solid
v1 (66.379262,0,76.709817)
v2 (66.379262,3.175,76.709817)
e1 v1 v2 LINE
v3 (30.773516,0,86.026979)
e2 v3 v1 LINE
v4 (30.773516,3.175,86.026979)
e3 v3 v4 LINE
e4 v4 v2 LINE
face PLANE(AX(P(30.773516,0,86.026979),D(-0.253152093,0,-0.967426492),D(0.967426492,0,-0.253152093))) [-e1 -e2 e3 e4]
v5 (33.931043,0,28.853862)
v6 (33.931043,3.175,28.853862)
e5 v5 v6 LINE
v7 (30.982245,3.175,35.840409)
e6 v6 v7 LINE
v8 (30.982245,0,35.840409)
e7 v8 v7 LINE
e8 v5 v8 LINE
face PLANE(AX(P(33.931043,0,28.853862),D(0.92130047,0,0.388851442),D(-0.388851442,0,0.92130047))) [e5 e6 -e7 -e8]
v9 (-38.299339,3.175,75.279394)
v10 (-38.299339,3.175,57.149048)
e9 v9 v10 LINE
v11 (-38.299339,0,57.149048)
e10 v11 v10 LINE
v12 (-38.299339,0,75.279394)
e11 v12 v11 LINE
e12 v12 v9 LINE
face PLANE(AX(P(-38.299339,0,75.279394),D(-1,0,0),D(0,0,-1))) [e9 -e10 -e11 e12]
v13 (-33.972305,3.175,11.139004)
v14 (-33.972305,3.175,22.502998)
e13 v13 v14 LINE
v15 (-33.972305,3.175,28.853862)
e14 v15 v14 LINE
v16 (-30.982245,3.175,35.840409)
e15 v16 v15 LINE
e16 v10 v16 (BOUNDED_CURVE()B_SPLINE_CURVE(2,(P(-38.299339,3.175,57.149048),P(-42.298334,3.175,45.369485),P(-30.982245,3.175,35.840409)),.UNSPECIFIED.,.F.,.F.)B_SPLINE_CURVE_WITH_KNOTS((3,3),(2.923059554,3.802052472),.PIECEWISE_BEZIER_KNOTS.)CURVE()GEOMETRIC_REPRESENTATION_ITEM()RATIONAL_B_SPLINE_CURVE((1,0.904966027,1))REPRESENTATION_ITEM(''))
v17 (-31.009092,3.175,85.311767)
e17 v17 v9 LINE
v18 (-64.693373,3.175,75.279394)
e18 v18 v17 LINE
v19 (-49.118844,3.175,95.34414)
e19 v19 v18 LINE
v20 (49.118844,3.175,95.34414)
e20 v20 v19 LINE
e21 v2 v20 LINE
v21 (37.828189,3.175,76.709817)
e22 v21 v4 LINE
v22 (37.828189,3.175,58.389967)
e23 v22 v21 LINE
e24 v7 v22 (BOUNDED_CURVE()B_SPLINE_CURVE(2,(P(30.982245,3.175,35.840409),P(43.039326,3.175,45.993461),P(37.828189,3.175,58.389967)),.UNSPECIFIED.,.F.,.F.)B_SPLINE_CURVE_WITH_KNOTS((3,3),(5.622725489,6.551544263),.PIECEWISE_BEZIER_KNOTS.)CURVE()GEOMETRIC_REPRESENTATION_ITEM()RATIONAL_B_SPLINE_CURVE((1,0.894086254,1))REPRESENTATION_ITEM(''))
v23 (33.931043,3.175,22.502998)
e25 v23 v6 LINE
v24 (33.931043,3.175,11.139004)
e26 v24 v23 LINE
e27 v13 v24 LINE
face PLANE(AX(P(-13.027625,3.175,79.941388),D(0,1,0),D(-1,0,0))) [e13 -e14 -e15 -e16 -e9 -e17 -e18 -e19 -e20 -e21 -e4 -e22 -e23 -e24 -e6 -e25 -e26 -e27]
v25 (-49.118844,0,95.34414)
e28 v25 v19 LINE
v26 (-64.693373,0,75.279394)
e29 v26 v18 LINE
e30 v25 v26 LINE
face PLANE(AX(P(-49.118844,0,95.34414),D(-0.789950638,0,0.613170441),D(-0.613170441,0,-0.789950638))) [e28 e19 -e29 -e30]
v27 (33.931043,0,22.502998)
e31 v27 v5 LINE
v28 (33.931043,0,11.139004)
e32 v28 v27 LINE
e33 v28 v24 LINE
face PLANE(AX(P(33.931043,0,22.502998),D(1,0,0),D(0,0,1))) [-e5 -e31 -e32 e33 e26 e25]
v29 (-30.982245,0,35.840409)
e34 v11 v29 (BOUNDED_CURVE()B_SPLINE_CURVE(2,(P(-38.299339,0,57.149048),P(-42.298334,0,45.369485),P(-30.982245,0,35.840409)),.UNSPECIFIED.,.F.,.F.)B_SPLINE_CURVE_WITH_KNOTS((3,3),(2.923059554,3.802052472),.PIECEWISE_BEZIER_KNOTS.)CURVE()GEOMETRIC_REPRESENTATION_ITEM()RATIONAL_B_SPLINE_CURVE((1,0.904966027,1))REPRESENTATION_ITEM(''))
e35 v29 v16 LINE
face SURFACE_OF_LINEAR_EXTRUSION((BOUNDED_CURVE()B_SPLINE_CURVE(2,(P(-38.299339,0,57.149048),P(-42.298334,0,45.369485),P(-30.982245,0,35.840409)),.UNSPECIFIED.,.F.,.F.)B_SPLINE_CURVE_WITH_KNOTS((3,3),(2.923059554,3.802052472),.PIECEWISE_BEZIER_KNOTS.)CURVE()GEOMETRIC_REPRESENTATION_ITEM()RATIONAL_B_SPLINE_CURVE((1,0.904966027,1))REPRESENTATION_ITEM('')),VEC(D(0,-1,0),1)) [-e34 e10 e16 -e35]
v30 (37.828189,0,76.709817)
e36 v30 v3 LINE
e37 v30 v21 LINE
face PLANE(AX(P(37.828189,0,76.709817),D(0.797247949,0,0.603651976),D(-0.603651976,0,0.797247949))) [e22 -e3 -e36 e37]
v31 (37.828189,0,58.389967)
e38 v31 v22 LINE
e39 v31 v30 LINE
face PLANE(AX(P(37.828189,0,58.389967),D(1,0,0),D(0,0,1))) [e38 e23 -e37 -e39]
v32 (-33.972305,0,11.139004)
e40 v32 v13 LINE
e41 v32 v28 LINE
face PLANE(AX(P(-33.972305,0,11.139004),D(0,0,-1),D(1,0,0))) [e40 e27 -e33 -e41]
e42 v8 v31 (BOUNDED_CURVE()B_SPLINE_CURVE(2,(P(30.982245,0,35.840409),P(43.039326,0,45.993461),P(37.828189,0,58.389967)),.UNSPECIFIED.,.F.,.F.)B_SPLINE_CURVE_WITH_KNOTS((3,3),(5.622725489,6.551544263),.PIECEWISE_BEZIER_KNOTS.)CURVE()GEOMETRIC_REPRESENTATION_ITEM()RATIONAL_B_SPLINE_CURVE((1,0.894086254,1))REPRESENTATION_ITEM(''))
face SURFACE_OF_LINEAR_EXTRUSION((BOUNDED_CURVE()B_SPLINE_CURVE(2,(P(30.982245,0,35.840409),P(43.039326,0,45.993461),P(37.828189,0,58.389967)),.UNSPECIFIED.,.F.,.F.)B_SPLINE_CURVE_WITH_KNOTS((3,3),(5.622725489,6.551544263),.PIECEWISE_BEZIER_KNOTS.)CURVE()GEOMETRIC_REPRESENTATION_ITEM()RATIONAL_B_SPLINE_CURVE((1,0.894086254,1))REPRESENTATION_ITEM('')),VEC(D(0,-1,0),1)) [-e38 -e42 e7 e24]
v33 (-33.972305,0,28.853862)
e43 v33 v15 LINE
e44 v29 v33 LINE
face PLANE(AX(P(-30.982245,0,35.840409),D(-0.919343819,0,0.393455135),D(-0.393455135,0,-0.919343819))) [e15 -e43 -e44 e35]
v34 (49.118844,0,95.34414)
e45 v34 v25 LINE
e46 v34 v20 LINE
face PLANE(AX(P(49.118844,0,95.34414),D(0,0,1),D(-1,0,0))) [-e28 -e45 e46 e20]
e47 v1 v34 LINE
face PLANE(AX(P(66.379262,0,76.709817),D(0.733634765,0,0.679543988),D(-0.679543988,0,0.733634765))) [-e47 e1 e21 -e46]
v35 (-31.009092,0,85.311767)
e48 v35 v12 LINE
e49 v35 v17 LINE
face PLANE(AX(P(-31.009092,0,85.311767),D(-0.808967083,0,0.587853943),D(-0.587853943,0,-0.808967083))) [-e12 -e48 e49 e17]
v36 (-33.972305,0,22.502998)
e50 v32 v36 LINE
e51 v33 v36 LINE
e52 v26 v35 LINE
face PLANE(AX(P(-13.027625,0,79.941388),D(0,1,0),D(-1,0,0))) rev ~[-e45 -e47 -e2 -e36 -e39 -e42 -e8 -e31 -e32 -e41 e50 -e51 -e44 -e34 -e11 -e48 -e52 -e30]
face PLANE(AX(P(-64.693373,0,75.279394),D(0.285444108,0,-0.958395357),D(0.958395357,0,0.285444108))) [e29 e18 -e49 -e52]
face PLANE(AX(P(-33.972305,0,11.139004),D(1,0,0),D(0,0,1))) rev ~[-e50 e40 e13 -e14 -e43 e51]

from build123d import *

# Parameters (mm, degrees)
F0_W     = 22.0716209825
F0_H     = 11.3639943302
F0_W_2   = 22.1128826787
F1_DEPTH = 3.175


with BuildPart() as f1:
    # F0 (on Front) → F1 (new body)
    with BuildSketch(Plane.XZ):
        with BuildLine():
            add(Edge.make_bspline(
                [(0, 77.2495130793), (-13.2024395854, 77.2495130793), (-23.7188442589, 72.0280801734)],
                knots=[1.5707963268, 1.5707963268, 1.5707963268, 2.2200254143, 2.2200254143, 2.2200254143], degree=2, weights=[1, 0.9477737356, 1]))
            ThreePointArc((0, 77.2495130793), (-14.9655593265, 88.7487135304), (-23.7188442589, 72.0280801734))
        make_face()
        with BuildLine():
            add(Edge.make_bspline(
                [(37.8281886895, 58.3899668587), (34.3045126324, 66.7722575902), (23.7188442589, 72.0280801734)],
                knots=[0.2683589556, 0.2683589556, 0.2683589556, 0.9215672393, 0.9215672393, 0.9215672393], degree=2, weights=[1, 0.9471372908, 1]))
            add(Edge.make_bspline(
                [(23.7188442589, 72.0280801734), (13.2024395854, 77.2495130793), (0, 77.2495130793)],
                knots=[0.9215672393, 0.9215672393, 0.9215672393, 1.5707963268, 1.5707963268, 1.5707963268], degree=2, weights=[1, 0.9477737356, 1]))
            add(Edge.make_bspline(
                [(0, 77.2495130793), (-13.2024395854, 77.2495130793), (-23.7188442589, 72.0280801734)],
                knots=[1.5707963268, 1.5707963268, 1.5707963268, 2.2200254143, 2.2200254143, 2.2200254143], degree=2, weights=[1, 0.9477737356, 1]))
            add(Edge.make_bspline(
                [(-23.7188442589, 72.0280801734), (-35.179956424, 66.3375965856), (-38.2993388492, 57.1490477352)],
                knots=[2.2200254143, 2.2200254143, 2.2200254143, 2.9230595545, 2.9230595545, 2.9230595545], degree=2, weights=[1, 0.9388514321, 1]))
            add(Edge.make_bspline(
                [(-38.2993388492, 57.1490477352), (-42.2983339169, 45.3694848208), (-30.9822451126, 35.8404089541)],
                knots=[2.9230595545, 2.9230595545, 2.9230595545, 3.8020524721, 3.8020524721, 3.8020524721], degree=2, weights=[1, 0.9049660266, 1]))
            Line((-30.9822451126, 35.8404089541), (-33.9723048082, 28.8538616849))
            Line((-33.9723048082, 28.8538616849), (-33.9723048082, 22.5029981736))
            Line((-33.9723048082, 22.5029981736), (-11.8594221295, 22.5029981736))
            Line((-11.8594221295, 22.5029981736), (-11.8594221295, 11.1390038435))
            Line((-11.8594221295, 11.1390038435), (11.8594221295, 11.1390038435))
            Line((11.8594221295, 11.1390038435), (11.8594221295, 22.5029981736))
            Line((11.8594221295, 22.5029981736), (33.931043112, 22.5029981736))
            Line((33.931043112, 22.5029981736), (33.931043112, 28.8538616849))
            Line((33.931043112, 28.8538616849), (30.9822451126, 35.8404089541))
            add(Edge.make_bspline(
                [(30.9822451126, 35.8404089541), (43.0393262584, 45.9934612106), (37.8281886895, 58.3899668587)],
                knots=[5.6227254887, 5.6227254887, 5.6227254887, 6.5515442627, 6.5515442627, 6.5515442627], degree=2, weights=[1, 0.894086254, 1]))
        make_face()
        with BuildLine():
            add(Edge.make_bspline(
                [(23.7188442589, 57.1490477352), (23.7188442589, 89.4658166317), (-16.7717556174, 66.614410199), (-57.2623554937, 43.7630037663), (0, 43.7630037663)],
                knots=[0, 0, 0, 2.3561944902, 2.3561944902, 4.7123889804, 4.7123889804, 4.7123889804], degree=2, weights=[1, 0.3826834324, 1, 0.3826834324, 1]))
            add(Edge.make_bspline(
                [(0, 43.7630037663), (23.7188442589, 43.7630037663), (23.7188442589, 57.1490477352)],
                knots=[4.7123889804, 4.7123889804, 4.7123889804, 6.2831853072, 6.2831853072, 6.2831853072], degree=2, weights=[1, 0.7071067812, 1]))
        make_face(mode=Mode.SUBTRACT)
        with Locations((22.8952326207, 16.8210010086)):
            Rectangle(F0_W, F0_H)
        with BuildLine():
            add(Edge.make_bspline(
                [(23.7188442589, 72.0280801734), (13.2024395854, 77.2495130793), (0, 77.2495130793)],
                knots=[0.9215672393, 0.9215672393, 0.9215672393, 1.5707963268, 1.5707963268, 1.5707963268], degree=2, weights=[1, 0.9477737356, 1]))
            ThreePointArc((23.7188442589, 72.0280801734), (14.8063132284, 88.0253233293), (0, 77.2495130793))
        make_face()
        with BuildLine():
            add(Edge.make_bspline(
                [(0, 43.7630037663), (23.7188442589, 43.7630037663), (23.7188442589, 57.1490477352)],
                knots=[4.7123889804, 4.7123889804, 4.7123889804, 6.2831853072, 6.2831853072, 6.2831853072], degree=2, weights=[1, 0.7071067812, 1]))
            add(Edge.make_bspline(
                [(23.7188442589, 57.1490477352), (23.7188442589, 89.4658166317), (-16.7717556174, 66.614410199), (-57.2623554937, 43.7630037663), (0, 43.7630037663)],
                knots=[0, 0, 0, 2.3561944902, 2.3561944902, 4.7123889804, 4.7123889804, 4.7123889804], degree=2, weights=[1, 0.3826834324, 1, 0.3826834324, 1]))
        make_face()
        with BuildLine():
            ThreePointArc((0, 77.2495130793), (14.8063132284, 88.0253233293), (23.7188442589, 72.0280801734))
            add(Edge.make_bspline(
                [(37.8281886895, 58.3899668587), (34.3045126324, 66.7722575902), (23.7188442589, 72.0280801734)],
                knots=[0.2683589556, 0.2683589556, 0.2683589556, 0.9215672393, 0.9215672393, 0.9215672393], degree=2, weights=[1, 0.9471372908, 1]))
            Line((37.8281886895, 58.3899668587), (37.8281886895, 76.7098173911))
            Line((37.8281886895, 76.7098173911), (30.7735164742, 86.026978908))
            Line((30.7735164742, 86.026978908), (66.3792615504, 76.7098173911))
            Line((66.3792615504, 76.7098173911), (49.1188442589, 95.3441404248))
            Line((49.1188442589, 95.3441404248), (23.7188442589, 95.3441404248))
            Line((23.7188442589, 95.3441404248), (-23.7188442589, 95.3441404248))
            Line((-23.7188442589, 95.3441404248), (-49.1188442589, 95.3441404248))
            Line((-49.1188442589, 95.3441404248), (-64.6933734609, 75.2793942231))
            Line((-64.6933734609, 75.2793942231), (-31.0090915541, 85.311767324))
            Line((-31.0090915541, 85.311767324), (-38.2993388492, 75.2793942231))
            Line((-38.2993388492, 75.2793942231), (-38.2993388492, 57.1490477352))
            add(Edge.make_bspline(
                [(-23.7188442589, 72.0280801734), (-35.179956424, 66.3375965856), (-38.2993388492, 57.1490477352)],
                knots=[2.2200254143, 2.2200254143, 2.2200254143, 2.9230595545, 2.9230595545, 2.9230595545], degree=2, weights=[1, 0.9388514321, 1]))
            ThreePointArc((-23.7188442589, 72.0280801734), (-14.9655593265, 88.7487135304), (0, 77.2495130793))
        make_face()
        with Locations((-22.9158634688, 16.8210010086)):
            Rectangle(F0_W_2, F0_H)
    extrude(amount=-F1_DEPTH)


solid = f1.part
